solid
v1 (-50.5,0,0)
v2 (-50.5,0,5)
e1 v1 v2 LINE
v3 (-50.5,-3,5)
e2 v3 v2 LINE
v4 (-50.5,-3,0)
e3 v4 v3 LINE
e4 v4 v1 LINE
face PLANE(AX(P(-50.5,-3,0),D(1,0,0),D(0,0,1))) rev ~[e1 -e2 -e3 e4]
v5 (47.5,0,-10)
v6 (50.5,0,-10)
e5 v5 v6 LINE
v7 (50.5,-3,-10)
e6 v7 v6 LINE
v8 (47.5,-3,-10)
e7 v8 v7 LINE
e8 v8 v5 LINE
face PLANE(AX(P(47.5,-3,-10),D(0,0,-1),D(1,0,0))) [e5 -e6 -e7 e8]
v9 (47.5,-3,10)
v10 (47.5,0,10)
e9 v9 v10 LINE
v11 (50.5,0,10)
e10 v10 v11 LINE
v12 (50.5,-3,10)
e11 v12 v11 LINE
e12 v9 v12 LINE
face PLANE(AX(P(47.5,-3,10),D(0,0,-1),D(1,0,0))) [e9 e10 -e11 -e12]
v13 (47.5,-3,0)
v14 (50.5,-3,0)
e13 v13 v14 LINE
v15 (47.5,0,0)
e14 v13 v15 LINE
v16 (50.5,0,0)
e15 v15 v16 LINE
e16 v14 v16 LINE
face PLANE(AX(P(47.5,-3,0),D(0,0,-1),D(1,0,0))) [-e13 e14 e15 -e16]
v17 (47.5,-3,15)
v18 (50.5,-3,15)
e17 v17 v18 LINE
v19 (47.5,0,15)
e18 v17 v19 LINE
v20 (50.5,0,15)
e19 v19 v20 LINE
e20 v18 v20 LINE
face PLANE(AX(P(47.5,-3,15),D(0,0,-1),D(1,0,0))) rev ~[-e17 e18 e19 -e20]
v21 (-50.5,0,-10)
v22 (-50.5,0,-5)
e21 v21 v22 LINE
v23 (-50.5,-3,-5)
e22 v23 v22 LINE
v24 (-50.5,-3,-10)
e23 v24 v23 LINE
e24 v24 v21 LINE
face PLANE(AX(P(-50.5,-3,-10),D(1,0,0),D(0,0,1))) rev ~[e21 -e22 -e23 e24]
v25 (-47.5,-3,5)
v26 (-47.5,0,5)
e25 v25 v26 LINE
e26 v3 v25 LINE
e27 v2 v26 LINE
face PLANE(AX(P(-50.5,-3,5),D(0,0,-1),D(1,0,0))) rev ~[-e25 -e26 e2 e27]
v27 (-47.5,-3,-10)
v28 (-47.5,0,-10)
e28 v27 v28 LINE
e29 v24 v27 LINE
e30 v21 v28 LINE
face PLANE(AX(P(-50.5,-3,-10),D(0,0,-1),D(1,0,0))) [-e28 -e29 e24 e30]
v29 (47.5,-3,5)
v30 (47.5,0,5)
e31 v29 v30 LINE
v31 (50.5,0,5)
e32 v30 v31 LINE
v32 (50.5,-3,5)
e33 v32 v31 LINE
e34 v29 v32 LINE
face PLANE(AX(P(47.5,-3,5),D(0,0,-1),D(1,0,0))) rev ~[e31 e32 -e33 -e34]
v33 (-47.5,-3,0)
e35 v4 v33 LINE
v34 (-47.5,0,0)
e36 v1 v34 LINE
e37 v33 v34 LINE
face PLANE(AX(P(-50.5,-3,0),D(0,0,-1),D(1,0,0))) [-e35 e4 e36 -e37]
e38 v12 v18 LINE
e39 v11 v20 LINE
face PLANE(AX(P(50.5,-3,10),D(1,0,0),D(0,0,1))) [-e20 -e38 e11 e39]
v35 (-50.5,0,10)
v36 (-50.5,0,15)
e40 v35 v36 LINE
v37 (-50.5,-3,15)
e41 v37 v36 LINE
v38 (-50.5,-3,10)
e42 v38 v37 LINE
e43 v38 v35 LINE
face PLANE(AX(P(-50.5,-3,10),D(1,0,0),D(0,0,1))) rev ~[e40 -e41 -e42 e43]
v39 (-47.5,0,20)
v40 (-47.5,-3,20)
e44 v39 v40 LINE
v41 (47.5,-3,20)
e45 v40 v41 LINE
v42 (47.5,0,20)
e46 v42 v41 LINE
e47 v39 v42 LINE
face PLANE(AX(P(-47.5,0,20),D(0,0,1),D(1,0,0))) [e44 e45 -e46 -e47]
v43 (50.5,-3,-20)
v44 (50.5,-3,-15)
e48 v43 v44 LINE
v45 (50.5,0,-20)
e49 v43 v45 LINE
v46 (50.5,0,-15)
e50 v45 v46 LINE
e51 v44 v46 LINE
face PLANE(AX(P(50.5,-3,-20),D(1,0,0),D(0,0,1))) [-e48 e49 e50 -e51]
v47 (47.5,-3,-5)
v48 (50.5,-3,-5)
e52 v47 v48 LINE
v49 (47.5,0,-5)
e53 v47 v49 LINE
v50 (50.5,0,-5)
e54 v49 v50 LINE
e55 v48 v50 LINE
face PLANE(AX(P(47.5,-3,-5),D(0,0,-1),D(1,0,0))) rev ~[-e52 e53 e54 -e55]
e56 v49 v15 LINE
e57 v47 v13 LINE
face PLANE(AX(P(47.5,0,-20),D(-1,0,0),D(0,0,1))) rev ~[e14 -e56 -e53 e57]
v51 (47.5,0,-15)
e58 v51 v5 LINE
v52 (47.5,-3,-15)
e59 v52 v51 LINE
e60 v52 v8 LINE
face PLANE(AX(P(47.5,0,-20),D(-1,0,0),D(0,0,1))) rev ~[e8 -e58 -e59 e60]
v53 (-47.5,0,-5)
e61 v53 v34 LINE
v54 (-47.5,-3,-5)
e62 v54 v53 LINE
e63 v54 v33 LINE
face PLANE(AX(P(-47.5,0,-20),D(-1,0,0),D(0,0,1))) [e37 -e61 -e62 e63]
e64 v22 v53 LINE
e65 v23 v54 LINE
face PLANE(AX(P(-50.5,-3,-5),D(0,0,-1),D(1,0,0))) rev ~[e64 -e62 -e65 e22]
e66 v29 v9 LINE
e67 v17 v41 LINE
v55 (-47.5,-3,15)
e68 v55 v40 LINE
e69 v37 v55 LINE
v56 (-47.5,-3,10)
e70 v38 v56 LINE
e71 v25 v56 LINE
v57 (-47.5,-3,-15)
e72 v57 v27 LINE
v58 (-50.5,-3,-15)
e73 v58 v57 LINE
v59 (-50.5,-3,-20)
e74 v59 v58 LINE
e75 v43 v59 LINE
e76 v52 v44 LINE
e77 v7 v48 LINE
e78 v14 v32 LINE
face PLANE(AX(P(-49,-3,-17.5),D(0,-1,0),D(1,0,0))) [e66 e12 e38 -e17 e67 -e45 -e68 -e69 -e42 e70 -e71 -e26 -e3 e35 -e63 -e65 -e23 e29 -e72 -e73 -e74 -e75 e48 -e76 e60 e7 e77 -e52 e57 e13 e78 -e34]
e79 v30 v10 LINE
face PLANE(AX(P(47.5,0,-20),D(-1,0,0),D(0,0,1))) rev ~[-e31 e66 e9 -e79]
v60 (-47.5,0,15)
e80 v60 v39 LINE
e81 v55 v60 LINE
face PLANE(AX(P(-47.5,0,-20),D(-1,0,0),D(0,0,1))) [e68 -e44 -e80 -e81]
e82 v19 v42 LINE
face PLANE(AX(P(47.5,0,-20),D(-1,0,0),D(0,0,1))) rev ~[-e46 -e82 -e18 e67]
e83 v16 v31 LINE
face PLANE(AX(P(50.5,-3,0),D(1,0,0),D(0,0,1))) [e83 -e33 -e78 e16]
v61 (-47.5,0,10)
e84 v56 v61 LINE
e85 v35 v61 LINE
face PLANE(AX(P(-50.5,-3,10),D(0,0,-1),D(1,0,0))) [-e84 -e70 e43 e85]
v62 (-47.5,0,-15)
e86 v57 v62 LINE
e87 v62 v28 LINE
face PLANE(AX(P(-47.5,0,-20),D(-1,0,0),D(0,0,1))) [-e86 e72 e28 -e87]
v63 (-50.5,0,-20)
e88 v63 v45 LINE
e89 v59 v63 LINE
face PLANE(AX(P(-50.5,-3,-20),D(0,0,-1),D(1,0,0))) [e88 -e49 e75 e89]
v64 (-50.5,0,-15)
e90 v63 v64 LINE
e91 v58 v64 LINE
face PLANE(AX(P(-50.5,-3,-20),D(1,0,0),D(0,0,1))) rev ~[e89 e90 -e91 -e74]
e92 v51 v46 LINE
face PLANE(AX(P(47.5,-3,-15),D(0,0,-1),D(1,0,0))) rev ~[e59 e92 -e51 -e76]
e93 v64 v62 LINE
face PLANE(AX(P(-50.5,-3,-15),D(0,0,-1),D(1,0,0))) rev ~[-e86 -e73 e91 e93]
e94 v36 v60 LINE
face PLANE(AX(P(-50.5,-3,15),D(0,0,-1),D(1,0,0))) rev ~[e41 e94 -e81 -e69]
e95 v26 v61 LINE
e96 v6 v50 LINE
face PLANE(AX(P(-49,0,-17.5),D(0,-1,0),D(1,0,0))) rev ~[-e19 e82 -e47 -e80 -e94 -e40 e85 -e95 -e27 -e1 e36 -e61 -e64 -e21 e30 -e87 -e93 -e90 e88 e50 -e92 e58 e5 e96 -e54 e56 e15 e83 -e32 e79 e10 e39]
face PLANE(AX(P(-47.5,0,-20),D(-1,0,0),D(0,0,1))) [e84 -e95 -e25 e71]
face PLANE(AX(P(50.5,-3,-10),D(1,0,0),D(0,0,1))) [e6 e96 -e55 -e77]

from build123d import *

# Parameters (mm, degrees)
F0_W     = 95
F0_H     = 40
F1_DEPTH = 3
F2_W     = 3
F2_H     = 5
F3_DEPTH = 3


# Not quite as in the source:
# - a feature names something its author has since deleted; it is built from what else it names


with BuildPart() as f1:
    # F0 (on Front) → F1 (new body)
    with BuildSketch(Plane.XZ):
        Rectangle(F0_W, F0_H)
    extrude(amount=F1_DEPTH)

    # F2 (on face) → F3 (join)
    with BuildSketch(Plane.XZ.offset(3)):
        with Locations((-49, -17.5)):
            Rectangle(F2_W, F2_H)
        with Locations((-49, -7.5)):
            Rectangle(F2_W, F2_H)
        with Locations((-49, 2.5)):
            Rectangle(F2_W, F2_H)
        with Locations((-49, 12.5)):
            Rectangle(F2_W, F2_H)
        with Locations((49, -7.5)):
            Rectangle(F2_W, F2_H)
        with Locations((49, -17.5)):
            Rectangle(F2_W, F2_H)
        with Locations((49, 12.5)):
            Rectangle(F2_W, F2_H)
        with Locations((49, 2.5)):
            Rectangle(F2_W, F2_H)
    extrude(amount=-F3_DEPTH)


solid = f1.part
